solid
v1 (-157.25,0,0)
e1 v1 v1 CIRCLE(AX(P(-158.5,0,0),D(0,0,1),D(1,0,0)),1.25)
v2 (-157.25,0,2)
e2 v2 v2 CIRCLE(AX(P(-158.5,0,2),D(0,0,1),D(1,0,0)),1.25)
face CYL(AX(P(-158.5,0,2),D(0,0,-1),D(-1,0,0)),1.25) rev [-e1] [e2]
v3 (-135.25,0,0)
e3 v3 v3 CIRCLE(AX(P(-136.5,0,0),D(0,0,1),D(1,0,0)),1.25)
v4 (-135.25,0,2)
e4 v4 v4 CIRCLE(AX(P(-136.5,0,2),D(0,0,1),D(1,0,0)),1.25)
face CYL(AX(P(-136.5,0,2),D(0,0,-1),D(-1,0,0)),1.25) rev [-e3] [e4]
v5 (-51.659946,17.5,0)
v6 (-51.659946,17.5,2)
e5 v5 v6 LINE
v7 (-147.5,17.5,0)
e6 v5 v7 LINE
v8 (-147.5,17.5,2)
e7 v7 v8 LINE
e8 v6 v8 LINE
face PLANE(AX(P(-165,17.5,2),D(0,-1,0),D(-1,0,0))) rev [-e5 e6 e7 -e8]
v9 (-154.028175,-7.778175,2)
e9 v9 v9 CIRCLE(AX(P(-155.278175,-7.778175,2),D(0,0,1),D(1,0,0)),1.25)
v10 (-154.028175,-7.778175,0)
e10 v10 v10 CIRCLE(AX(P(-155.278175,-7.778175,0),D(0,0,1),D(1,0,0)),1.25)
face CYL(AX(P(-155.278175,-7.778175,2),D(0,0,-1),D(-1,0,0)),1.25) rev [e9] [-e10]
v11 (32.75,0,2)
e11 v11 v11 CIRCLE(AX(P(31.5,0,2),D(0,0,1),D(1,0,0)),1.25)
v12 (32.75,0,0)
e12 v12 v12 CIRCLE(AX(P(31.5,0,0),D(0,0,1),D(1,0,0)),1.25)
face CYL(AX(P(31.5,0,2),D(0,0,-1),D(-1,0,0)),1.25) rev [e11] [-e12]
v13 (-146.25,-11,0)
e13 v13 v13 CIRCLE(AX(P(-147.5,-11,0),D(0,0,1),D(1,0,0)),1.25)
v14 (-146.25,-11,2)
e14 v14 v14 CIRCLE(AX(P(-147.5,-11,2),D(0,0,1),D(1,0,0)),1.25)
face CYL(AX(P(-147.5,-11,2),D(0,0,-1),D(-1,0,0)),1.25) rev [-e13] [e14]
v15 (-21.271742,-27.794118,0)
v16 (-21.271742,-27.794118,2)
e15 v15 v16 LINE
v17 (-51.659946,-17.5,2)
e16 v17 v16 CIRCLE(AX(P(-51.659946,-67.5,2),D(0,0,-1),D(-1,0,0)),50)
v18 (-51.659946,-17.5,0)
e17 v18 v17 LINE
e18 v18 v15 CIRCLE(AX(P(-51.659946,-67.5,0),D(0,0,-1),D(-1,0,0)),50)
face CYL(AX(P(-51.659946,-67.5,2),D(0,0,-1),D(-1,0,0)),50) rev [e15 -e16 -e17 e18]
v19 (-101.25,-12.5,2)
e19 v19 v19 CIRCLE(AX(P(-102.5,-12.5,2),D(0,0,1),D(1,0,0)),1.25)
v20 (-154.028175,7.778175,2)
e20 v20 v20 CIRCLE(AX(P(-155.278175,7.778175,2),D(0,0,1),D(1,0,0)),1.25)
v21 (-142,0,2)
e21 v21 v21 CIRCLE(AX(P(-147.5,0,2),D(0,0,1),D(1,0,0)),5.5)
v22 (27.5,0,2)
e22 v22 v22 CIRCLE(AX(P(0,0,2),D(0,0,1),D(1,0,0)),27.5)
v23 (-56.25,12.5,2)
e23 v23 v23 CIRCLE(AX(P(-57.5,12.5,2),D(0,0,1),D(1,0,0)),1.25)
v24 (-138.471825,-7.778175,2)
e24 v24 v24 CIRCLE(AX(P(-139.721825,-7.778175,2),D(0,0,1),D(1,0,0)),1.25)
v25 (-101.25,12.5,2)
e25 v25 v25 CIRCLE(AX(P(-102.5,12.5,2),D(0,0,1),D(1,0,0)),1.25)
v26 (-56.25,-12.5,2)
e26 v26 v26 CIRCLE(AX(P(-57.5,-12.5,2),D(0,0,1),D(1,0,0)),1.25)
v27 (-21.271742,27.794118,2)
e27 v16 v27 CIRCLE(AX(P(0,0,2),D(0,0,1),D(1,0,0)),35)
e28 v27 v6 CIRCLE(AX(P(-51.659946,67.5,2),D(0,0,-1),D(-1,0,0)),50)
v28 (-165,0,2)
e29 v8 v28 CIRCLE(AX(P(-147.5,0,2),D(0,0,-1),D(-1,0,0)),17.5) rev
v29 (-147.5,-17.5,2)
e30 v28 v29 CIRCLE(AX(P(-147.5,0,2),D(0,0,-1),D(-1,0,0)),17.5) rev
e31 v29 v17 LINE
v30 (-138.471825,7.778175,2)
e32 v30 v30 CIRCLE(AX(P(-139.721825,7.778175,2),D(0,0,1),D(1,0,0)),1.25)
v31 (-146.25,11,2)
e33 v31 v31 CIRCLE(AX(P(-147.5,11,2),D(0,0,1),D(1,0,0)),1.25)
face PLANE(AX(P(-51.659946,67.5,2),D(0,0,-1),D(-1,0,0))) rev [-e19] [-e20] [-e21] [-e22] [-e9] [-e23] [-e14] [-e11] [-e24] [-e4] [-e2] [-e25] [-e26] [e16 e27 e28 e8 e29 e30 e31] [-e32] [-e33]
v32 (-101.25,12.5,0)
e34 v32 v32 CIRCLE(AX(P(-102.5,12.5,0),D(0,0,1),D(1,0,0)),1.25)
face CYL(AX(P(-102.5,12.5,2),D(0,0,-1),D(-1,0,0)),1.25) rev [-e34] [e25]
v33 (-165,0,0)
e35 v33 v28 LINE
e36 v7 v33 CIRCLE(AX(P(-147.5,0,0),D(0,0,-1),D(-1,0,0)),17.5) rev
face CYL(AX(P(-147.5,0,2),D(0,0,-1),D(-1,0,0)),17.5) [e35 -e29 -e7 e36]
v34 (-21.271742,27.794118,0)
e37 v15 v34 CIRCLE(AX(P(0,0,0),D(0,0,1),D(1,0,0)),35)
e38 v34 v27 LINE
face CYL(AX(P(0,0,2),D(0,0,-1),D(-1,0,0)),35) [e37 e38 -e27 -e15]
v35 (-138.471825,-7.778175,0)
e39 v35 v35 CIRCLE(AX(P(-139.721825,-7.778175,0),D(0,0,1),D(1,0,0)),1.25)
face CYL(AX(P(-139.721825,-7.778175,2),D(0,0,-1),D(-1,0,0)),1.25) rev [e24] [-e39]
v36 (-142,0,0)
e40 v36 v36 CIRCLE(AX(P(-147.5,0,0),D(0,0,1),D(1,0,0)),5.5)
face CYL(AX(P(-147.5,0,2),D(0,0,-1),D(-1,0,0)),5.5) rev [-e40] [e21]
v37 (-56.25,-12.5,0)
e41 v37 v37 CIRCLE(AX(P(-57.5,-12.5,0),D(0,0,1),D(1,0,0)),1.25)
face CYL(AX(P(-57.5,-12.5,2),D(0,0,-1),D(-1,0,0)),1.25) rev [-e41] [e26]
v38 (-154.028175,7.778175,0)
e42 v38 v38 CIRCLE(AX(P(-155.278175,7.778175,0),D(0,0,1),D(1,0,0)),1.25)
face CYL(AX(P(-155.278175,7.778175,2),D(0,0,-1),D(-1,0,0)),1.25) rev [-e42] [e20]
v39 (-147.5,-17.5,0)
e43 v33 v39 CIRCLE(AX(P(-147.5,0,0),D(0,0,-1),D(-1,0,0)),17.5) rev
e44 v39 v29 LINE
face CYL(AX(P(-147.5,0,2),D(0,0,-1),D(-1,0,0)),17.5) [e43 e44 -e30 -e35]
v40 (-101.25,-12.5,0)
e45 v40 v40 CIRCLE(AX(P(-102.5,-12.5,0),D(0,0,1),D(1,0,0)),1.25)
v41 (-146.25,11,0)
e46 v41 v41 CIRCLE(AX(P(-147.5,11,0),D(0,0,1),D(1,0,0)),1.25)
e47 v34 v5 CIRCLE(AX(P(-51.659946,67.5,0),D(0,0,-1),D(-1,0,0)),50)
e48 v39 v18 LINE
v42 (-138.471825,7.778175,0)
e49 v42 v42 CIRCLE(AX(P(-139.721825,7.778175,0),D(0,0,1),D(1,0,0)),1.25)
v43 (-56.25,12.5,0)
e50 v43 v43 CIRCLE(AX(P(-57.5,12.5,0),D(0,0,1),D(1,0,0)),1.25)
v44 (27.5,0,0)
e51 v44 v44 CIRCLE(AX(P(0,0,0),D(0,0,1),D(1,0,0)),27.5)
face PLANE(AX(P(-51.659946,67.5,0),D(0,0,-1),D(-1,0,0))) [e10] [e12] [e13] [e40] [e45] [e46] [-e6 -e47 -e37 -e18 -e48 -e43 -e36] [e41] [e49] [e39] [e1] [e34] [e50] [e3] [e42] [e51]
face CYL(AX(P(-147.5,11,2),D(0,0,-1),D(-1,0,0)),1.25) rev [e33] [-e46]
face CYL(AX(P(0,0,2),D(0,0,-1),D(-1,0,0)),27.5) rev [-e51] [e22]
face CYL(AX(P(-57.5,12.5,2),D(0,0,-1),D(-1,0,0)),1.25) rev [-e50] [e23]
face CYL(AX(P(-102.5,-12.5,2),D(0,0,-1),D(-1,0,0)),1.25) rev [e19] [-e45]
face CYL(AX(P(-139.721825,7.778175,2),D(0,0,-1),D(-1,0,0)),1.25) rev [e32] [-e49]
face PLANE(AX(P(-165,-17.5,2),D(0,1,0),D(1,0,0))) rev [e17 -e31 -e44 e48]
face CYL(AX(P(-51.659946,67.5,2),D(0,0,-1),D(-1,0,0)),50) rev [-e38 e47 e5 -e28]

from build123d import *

# Parameters (mm, degrees)
ESBO_O1_R                = 27.5
ESBO_O1_R_2              = 5.5
ESBO_O1_R_3              = 1.25
RESSALTO_EXTRUS_O1_DEPTH = 2
FILETE1_R                = 17.5


with BuildPart() as part:
    # Esboço1 → Ressalto-extrusão1 (new body)
    with BuildSketch(Plane.XY):
        with BuildLine():
            Line((-165, 17.5), (-165, -17.5))
            Line((-165, -17.5), (-51.659945799, -17.5))
            ThreePointArc((-51.659945799, -17.5), (-35.617722101, -20.143405329), (-21.271742388, -27.794117647))
            ThreePointArc((-21.271742388, -27.794117647), (35, 0), (-21.271742388, 27.794117647))
            ThreePointArc((-21.271742388, 27.794117647), (-35.617722101, 20.143405329), (-51.659945799, 17.5))
            Line((-51.659945799, 17.5), (-165, 17.5))
        make_face()
        Circle(ESBO_O1_R, mode=Mode.SUBTRACT)
        with Locations((-147.5, 0)):
            Circle(ESBO_O1_R_2, mode=Mode.SUBTRACT)
        with Locations((-147.5, 11)):
            Circle(ESBO_O1_R_3, mode=Mode.SUBTRACT)
        with Locations((-139.721825407, 7.778174593)):
            Circle(ESBO_O1_R_3, mode=Mode.SUBTRACT)
        with Locations((-136.5, 0)):
            Circle(ESBO_O1_R_3, mode=Mode.SUBTRACT)
        with Locations((-139.721825407, -7.778174593)):
            Circle(ESBO_O1_R_3, mode=Mode.SUBTRACT)
        with Locations((-147.5, -11)):
            Circle(ESBO_O1_R_3, mode=Mode.SUBTRACT)
        with Locations((-155.278174593, -7.778174593)):
            Circle(ESBO_O1_R_3, mode=Mode.SUBTRACT)
        with Locations((-158.5, 0)):
            Circle(ESBO_O1_R_3, mode=Mode.SUBTRACT)
        with Locations((-155.278174593, 7.778174593)):
            Circle(ESBO_O1_R_3, mode=Mode.SUBTRACT)
        with Locations((31.5, 0)):
            Circle(ESBO_O1_R_3, mode=Mode.SUBTRACT)
        with Locations((-57.5, 12.5)):
            Circle(ESBO_O1_R_3, mode=Mode.SUBTRACT)
        with Locations((-102.5, 12.5)):
            Circle(ESBO_O1_R_3, mode=Mode.SUBTRACT)
        with Locations((-102.5, -12.5)):
            Circle(ESBO_O1_R_3, mode=Mode.SUBTRACT)
        with Locations((-57.5, -12.5)):
            Circle(ESBO_O1_R_3, mode=Mode.SUBTRACT)
    extrude(amount=RESSALTO_EXTRUS_O1_DEPTH)

    # Filete1
    filete1_edges = [part.edges().sort_by_distance(p)[0] for p in [
        (-165, -17.5, 1),
        (-165, 17.5, 1),
    ]]
    fillet(filete1_edges, radius=FILETE1_R - 0.0001)  # a hair under: the kernel refuses the full size


solid = part.part
